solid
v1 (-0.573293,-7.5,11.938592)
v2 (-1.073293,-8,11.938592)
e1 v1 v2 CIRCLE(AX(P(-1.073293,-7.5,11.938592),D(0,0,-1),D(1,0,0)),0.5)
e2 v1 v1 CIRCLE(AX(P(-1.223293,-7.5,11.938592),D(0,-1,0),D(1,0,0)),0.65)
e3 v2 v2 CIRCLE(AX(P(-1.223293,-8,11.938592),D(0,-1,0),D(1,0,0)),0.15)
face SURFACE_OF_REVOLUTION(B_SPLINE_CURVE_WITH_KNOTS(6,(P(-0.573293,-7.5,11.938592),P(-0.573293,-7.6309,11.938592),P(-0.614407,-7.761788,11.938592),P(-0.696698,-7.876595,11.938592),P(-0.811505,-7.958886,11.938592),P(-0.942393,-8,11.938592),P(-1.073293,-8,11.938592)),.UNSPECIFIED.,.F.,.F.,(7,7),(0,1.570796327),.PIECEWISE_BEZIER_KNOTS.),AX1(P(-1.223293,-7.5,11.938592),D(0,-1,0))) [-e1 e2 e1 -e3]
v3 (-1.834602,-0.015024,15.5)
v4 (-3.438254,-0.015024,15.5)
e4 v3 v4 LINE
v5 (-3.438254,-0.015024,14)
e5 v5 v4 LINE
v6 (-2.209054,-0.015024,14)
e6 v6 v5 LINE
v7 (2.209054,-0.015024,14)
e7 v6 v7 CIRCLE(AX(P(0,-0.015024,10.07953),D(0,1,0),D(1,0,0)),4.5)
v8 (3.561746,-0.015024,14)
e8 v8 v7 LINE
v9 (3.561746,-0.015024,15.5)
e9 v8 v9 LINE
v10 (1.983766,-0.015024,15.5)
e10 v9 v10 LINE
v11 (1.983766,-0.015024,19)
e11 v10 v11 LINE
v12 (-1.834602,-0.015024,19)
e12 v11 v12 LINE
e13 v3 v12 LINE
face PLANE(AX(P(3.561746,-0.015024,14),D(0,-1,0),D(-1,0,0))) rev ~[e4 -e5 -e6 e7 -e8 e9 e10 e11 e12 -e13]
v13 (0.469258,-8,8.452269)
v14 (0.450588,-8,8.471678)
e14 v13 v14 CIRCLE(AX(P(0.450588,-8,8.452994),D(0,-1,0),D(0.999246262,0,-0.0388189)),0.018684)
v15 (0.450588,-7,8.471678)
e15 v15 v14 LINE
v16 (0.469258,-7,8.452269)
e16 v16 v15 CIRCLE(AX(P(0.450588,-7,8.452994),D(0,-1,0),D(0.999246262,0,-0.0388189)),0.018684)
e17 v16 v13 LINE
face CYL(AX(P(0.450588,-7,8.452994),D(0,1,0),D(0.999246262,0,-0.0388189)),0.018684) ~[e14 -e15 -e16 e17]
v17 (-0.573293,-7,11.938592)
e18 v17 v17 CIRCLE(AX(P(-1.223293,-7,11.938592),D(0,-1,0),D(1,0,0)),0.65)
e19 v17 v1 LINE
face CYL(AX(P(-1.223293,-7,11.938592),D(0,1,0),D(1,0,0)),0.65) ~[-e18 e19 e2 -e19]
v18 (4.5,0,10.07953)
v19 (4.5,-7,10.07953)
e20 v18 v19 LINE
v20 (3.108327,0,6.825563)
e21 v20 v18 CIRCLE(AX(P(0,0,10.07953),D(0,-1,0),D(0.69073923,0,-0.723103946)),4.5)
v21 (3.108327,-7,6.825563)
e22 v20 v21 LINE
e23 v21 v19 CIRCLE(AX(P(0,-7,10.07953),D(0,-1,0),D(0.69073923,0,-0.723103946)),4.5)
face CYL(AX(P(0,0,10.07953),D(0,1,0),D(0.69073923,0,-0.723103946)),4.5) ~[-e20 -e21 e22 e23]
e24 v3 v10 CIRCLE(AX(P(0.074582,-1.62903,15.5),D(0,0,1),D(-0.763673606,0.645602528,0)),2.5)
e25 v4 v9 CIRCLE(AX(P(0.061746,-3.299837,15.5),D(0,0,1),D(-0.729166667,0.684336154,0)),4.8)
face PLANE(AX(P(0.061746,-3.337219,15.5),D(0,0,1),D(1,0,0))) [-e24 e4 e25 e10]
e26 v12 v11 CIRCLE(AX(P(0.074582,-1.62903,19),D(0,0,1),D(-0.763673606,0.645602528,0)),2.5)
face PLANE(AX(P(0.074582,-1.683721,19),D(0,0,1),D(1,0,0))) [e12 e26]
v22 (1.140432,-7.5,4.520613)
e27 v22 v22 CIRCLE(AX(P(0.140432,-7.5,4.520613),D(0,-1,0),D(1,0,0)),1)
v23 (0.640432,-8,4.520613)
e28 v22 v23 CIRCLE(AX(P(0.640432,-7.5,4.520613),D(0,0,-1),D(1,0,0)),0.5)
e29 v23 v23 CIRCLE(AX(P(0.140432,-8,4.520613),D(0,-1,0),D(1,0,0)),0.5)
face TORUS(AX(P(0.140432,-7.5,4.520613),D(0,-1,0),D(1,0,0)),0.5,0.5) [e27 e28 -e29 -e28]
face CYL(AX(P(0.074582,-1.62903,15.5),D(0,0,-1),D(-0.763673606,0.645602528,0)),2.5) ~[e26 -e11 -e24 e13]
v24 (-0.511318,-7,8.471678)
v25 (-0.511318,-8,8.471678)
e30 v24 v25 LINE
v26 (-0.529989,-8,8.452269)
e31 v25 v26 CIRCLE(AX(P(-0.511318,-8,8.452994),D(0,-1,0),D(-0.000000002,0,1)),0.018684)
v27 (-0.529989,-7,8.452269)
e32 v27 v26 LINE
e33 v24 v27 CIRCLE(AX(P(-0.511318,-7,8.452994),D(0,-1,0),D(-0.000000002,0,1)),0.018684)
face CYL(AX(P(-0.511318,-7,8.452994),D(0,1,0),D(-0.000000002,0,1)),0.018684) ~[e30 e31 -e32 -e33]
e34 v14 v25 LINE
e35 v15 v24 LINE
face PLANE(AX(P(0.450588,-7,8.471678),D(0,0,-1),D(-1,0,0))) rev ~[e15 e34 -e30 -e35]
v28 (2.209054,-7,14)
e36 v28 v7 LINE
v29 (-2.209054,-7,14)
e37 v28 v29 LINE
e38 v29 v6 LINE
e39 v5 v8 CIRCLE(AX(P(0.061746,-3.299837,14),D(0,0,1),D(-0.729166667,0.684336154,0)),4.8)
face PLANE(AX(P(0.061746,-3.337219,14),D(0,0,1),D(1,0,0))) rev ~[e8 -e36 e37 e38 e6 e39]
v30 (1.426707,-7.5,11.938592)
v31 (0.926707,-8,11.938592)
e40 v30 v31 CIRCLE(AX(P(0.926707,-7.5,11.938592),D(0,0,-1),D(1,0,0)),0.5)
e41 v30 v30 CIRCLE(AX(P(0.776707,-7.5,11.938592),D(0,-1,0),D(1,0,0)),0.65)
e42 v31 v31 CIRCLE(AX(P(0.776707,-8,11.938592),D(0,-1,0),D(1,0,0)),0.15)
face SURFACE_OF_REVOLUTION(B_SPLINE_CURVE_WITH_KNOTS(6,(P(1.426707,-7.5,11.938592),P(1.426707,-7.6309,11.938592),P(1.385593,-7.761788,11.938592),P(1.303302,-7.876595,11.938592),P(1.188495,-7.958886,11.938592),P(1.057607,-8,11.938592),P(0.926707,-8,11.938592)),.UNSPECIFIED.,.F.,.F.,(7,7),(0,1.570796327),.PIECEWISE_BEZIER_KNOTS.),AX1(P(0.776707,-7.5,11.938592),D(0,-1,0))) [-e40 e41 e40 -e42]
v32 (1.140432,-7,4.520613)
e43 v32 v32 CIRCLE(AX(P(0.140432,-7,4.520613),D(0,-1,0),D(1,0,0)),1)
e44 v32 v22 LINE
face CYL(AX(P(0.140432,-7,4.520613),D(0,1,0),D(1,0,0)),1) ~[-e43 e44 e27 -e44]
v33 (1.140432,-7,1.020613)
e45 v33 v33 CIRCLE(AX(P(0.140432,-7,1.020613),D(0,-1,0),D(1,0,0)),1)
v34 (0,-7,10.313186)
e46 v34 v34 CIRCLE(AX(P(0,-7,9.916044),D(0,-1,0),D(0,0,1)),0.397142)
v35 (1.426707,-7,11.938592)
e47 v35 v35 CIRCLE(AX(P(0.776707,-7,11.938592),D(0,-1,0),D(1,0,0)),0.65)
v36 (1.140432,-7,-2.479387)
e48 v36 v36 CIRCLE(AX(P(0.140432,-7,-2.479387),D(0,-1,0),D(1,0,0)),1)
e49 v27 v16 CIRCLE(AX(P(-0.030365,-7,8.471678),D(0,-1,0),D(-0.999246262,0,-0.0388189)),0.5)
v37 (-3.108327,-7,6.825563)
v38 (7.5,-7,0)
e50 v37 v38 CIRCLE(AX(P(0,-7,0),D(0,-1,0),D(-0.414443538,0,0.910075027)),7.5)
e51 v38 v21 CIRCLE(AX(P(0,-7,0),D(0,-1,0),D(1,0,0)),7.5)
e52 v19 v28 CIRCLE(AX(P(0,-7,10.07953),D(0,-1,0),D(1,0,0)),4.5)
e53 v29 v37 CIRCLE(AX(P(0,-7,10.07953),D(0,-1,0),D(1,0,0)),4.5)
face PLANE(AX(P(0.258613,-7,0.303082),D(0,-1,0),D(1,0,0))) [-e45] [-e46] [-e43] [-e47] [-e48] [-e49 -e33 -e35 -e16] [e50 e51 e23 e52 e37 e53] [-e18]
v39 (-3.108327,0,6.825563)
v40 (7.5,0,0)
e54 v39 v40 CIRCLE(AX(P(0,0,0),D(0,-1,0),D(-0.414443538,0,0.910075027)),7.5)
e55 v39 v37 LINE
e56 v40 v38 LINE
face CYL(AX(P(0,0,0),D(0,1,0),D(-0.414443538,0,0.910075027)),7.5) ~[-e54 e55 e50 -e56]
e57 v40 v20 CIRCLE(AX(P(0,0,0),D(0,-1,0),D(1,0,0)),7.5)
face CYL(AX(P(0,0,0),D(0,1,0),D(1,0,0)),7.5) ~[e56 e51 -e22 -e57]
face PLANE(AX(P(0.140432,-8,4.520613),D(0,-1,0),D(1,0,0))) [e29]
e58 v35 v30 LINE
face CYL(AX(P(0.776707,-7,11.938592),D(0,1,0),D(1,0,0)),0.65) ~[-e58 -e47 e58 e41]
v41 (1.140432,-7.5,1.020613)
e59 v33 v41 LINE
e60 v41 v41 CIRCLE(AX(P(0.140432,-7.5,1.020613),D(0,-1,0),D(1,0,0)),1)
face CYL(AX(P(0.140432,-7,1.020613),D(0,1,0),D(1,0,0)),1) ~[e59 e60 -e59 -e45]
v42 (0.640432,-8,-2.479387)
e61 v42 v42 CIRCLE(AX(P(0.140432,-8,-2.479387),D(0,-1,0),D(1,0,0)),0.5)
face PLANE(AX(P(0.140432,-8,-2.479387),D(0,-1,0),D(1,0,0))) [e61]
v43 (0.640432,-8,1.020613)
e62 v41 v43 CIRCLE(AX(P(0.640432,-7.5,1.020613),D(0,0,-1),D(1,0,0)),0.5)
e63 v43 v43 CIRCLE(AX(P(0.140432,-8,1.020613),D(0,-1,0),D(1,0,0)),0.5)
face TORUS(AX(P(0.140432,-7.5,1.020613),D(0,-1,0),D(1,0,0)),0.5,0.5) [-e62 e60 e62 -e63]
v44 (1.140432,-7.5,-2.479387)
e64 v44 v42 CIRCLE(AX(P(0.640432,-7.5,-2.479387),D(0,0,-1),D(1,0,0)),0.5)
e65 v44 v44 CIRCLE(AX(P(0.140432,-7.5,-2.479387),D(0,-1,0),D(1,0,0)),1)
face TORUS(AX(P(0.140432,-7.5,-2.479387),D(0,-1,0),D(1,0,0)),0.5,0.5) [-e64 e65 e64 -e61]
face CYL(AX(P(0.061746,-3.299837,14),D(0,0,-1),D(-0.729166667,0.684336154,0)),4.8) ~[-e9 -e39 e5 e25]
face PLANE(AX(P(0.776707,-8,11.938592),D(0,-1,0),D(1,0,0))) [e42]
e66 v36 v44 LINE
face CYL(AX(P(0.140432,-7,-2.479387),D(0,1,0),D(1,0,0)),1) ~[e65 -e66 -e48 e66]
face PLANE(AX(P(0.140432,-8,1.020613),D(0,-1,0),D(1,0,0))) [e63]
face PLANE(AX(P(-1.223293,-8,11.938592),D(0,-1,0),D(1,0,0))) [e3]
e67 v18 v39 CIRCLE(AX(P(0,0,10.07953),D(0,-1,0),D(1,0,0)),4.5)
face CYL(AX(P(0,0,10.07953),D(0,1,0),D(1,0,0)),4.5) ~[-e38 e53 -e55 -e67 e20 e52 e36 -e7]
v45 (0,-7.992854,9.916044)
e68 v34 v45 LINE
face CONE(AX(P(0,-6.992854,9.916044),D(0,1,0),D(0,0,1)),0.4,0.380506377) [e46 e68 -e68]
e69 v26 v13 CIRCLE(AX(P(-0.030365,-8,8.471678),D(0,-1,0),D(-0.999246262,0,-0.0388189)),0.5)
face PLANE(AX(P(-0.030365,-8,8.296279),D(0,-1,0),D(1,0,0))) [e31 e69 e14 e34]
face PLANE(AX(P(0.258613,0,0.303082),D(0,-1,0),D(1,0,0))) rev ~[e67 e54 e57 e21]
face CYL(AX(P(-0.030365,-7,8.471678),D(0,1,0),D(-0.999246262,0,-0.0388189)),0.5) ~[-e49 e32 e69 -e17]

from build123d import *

# Parameters (mm, degrees)
F1_DEPTH  = 7
F2_DEPTH  = 7
F3_R      = 1
F4_DEPTH  = 1
F5_DEPTH  = 1
F6_DEPTH  = 1
F7_R      = 0.65
F8_DEPTH  = 1
F9_DEPTH  = 1
F14_DEPTH = 1.5
F16_DEPTH = 3.5
F18_DEPTH = 1
F19_R     = 0.5


# Not quite as in the source:
# - a feature names something its author has since deleted; it is built from what else it names


with BuildPart() as f1:
    # F0 (on Front) → F1 (new body)
    with BuildSketch(Plane.XZ):
        with BuildLine():
            ThreePointArc((-3.1083265336, 6.8255626992), (0, 5.5795304558), (3.1083265336, 6.8255626992))
            ThreePointArc((3.1083265336, 6.8255626992), (0, 7.5), (-3.1083265336, 6.8255626992))
        make_face()
        with BuildLine():
            ThreePointArc((-3.1083265336, 6.8255626992), (0, 7.5), (3.1083265336, 6.8255626992))
            ThreePointArc((3.1083265336, 6.8255626992), (4.1374792689, 8.3099922958), (4.5, 10.0795304558))
            ThreePointArc((4.5, 10.0795304558), (-1.7695381599, 14.2170097247), (-3.1083265336, 6.8255626992))
        make_face()
    extrude(amount=F1_DEPTH)

    # F0 (on Front) → F2 (join)
    with BuildSketch(Plane.XZ):
        with BuildLine():
            ThreePointArc((-3.1083265336, 6.8255626992), (-4.0581739119, -6.3072358844), (7.5, 0))
            ThreePointArc((7.5, 0), (6.3072358844, 4.0581739119), (3.1083265336, 6.8255626992))
            ThreePointArc((3.1083265336, 6.8255626992), (0, 5.5795304558), (-3.1083265336, 6.8255626992))
        make_face()
    extrude(amount=F2_DEPTH)

    # F3 (on face) → F4 (join)
    with BuildSketch(Plane.XZ.offset(7)):
        with Locations((0.1404315871, 4.5206134686)):
            Circle(F3_R)
    extrude(amount=F4_DEPTH)

    # F3 (on face) → F5 (join)
    with BuildSketch(Plane.XZ.offset(7)):
        with Locations((0.1404315871, 1.0206134686)):
            Circle(F3_R)
    extrude(amount=F5_DEPTH)

    # F3 (on face) → F6 (join)
    with BuildSketch(Plane.XZ.offset(7)):
        with Locations((0.1404315871, -2.4793865314)):
            Circle(F3_R)
    extrude(amount=F6_DEPTH)

    # F7 (on face) → F8 (join)
    with BuildSketch(Plane.XZ.offset(7)):
        with Locations((-1.2232928476, 11.9385918571)):
            Circle(F7_R)
    extrude(amount=F8_DEPTH)

    # F7 (on face) → F9 (join)
    with BuildSketch(Plane.XZ.offset(7)):
        with Locations((0.7767071524, 11.9385918571)):
            Circle(F7_R)
    extrude(amount=F9_DEPTH)

    # F10 (on Right) → F11 (revolve)
    with BuildSketch(Plane.YZ):
        Polygon((-7.9928543597, 9.9160444998), (-6.9928543597, 9.9160444998), (-6.9928543597, 10.3160444998), align=None)
    revolve(axis=Axis((0, -7.4928543597, 9.9160444998), (0, -1, 0)))

    # F13 (on offset) → F14 (join)
    with BuildSketch(Plane.XY.offset(14)):
        with BuildLine():
            Line((3.561746113, -0.0150235719), (-3.438253887, -0.0150235719))
            ThreePointArc((-3.438253887, -0.0150235719), (0.061746113, -8.099837113), (3.561746113, -0.0150235719))
        make_face()
    extrude(amount=F14_DEPTH)

    # F15 (on face) → F16 (join)
    with BuildSketch(Plane.XY.offset(15.5)):
        with BuildLine():
            Line((1.9837659688, -0.0150235719), (-1.8346020611, -0.0150235719))
            ThreePointArc((-1.8346020611, -0.0150235719), (0.0745819538, -4.1290298907), (1.9837659688, -0.0150235719))
        make_face()
    extrude(amount=F16_DEPTH)

    # F17 (on face) → F18 (join)
    with BuildSketch(Plane.XZ.offset(7)):
        with BuildLine():
            Line((0.4505876301, 8.4716784917), (-0.5113184951, 8.4716784917))
            ThreePointArc((-0.5113184951, 8.4716784917), (-0.5247841756, 8.4659470606), (-0.5299885637, 8.4522690419))
            ThreePointArc((-0.5299885637, 8.4522690419), (-0.0303654325, 7.9716784917), (0.4692576987, 8.4522690419))
            ThreePointArc((0.4692576987, 8.4522690419), (0.4640533106, 8.4659470606), (0.4505876301, 8.4716784917))
        make_face()
    extrude(amount=F18_DEPTH)

    # F19
    f19_edges = [f1.edges().sort_by_distance(p)[0] for p in [
        (-1.873293, -8, 11.938592),
        (0.126707, -8, 11.938592),
        (-0.859568, -8, 4.520613),
        (-0.859568, -8, 1.020613),
        (-0.859568, -8, -2.479387),
    ]]
    fillet(f19_edges, radius=F19_R)


solid = f1.part
